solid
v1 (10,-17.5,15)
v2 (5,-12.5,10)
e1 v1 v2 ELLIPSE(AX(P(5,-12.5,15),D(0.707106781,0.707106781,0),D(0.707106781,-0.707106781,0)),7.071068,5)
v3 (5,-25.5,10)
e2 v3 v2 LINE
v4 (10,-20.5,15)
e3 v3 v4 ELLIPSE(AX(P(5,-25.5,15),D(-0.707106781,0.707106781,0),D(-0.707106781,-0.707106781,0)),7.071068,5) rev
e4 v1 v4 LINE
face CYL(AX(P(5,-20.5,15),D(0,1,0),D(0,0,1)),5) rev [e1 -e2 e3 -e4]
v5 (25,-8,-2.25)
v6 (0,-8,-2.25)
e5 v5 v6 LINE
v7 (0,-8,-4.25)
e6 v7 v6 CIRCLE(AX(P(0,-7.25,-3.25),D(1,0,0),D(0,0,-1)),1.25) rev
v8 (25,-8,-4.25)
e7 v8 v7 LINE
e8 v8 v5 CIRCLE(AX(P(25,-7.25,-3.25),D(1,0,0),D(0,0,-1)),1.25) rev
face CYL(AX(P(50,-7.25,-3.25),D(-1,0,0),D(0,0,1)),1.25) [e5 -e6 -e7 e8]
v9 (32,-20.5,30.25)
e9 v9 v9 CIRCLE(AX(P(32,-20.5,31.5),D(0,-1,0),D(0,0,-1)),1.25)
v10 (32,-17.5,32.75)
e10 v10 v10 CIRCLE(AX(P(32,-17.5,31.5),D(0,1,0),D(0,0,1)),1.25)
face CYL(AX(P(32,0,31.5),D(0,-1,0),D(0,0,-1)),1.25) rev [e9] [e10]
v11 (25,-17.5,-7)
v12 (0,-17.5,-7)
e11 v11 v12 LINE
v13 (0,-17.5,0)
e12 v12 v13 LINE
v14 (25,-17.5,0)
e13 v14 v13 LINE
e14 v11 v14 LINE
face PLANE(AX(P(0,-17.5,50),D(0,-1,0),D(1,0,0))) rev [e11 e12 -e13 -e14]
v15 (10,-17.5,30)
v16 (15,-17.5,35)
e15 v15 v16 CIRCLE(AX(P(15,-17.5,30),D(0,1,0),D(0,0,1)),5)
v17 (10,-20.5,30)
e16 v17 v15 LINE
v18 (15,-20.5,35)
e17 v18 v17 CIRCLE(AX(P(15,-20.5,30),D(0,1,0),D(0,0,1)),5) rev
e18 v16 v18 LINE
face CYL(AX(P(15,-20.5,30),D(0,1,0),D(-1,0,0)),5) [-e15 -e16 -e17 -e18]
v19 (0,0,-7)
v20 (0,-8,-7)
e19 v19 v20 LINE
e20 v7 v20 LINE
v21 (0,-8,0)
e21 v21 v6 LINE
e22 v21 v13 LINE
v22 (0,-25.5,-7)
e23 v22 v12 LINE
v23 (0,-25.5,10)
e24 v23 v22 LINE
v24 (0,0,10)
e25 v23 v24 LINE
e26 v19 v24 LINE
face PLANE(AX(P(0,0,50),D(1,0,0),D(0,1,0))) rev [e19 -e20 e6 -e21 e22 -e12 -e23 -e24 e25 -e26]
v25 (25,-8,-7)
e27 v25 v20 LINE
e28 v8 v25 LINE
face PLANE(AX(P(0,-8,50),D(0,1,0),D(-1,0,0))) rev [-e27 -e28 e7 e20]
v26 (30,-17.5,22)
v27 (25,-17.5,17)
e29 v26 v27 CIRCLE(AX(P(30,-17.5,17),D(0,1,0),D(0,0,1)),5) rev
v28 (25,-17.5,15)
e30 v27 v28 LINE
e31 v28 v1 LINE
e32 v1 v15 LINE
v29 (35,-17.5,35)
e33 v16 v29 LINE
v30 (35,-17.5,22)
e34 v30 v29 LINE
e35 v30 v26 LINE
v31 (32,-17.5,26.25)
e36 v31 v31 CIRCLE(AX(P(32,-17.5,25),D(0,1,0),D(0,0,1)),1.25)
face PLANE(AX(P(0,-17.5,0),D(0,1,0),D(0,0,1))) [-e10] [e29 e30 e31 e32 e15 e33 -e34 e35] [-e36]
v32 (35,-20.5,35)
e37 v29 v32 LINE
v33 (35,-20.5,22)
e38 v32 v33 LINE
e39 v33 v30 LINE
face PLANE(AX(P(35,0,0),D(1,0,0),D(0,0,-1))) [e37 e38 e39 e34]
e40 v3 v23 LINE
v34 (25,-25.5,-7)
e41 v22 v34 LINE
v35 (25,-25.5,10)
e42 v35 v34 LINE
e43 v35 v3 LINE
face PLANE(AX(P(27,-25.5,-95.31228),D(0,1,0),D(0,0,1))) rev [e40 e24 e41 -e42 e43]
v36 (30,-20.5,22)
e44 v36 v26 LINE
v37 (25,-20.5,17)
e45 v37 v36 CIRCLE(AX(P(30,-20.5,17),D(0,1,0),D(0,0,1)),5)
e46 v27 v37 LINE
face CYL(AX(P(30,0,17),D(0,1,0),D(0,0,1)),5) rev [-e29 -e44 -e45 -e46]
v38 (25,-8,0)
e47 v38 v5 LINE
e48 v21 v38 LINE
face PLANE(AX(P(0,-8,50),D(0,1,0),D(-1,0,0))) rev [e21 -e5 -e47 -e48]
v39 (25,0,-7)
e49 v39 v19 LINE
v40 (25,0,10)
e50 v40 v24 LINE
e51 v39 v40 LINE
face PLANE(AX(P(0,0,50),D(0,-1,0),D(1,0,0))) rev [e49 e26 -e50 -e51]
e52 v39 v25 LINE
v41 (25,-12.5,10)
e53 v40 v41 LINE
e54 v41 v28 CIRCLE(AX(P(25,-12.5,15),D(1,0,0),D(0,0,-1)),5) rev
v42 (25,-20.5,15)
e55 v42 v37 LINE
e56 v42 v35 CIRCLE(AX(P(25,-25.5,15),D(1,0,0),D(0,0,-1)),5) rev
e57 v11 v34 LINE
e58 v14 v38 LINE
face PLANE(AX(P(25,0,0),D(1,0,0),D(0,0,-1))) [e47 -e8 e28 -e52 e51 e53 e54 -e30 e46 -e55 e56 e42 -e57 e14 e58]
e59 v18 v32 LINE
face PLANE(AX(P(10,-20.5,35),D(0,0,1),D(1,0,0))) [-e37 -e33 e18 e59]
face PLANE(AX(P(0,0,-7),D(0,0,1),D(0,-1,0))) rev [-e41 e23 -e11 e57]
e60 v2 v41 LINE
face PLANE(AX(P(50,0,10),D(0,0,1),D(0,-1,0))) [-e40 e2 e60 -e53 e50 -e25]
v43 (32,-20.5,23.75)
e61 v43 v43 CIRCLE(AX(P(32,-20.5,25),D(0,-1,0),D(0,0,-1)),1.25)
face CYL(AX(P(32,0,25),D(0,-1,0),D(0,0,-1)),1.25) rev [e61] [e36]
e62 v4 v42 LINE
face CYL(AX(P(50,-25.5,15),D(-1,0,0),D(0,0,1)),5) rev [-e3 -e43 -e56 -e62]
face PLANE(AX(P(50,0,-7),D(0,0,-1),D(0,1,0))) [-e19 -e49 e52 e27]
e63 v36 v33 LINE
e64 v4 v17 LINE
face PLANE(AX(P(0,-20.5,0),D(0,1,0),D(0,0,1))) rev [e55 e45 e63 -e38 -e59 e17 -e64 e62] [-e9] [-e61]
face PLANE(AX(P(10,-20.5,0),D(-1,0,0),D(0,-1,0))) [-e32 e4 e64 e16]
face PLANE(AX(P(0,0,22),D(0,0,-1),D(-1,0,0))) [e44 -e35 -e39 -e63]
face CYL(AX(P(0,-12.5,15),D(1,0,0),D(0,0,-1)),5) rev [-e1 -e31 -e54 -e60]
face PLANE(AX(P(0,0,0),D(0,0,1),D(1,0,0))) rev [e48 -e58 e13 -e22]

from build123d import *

# Parameters (mm, degrees)
BOSS_EXTRUDE1_DEPTH = 50
SKETCH2_W           = 7
SKETCH2_H           = 8
BOSS_EXTRUDE2_DEPTH = 50
SKETCH2_3_W         = 7
SKETCH2_3_H         = 8
BOSS_EXTRUDE3_DEPTH = 18
SKETCH3_W           = 10
SKETCH3_H           = 63
SKETCH3_W_2         = 7
SKETCH3_H_2         = 8
BOSS_EXTRUDE4_DEPTH = 82
FILLET1_R           = 5
SKETCH4_W           = 49
SKETCH4_H           = 25.5
CUT_EXTRUDE1_DEPTH  = 63
SKETCH5_W           = 25.5
SKETCH5_H           = 10
SKETCH5_H_2         = 12
BOSS_EXTRUDE5_DEPTH = 49
CUT_EXTRUDE2_DEPTH  = 25.5
SKETCH6_R           = 1.75
CUT_EXTRUDE3_DEPTH  = 5
SKETCH6_6_R         = 0.75
CUT_EXTRUDE4_DEPTH  = 15
SKETCH8_W           = 18
SKETCH8_H           = 9.5
CUT_EXTRUDE5_DEPTH  = 40
SKETCH9_W           = 40
SKETCH9_H           = 25.5
CUT_EXTRUDE6_DEPTH  = 110.982953225
SKETCH10_W          = 32
SKETCH10_H          = 88.5
CUT_EXTRUDE7_DEPTH  = 111.174861016
SKETCH11_W          = 50
SKETCH11_H          = 63
CUT_EXTRUDE8_DEPTH  = 105.797423632
SKETCH12_W          = 25.5
SKETCH12_H          = 35
BOSS_EXTRUDE7_DEPTH = 10
SKETCH12_3_R        = 10
CUT_EXTRUDE9_DEPTH  = 107.716915248
SKETCH13_W          = 42.5
SKETCH13_H          = 88.5
CUT_EXTRUDE10_DEPTH = 25
SKETCH14_W          = 25
SKETCH14_H          = 28
CUT_EXTRUDE11_DEPTH = 96.433222727
SKETCH15_W          = 25
SKETCH15_H          = 60.5
CUT_EXTRUDE12_DEPTH = 71.25311381
SKETCH16_W          = 10
SKETCH16_H          = 35
CUT_EXTRUDE13_DEPTH = 68.633201906
SKETCH17_W          = 15
SKETCH17_H          = 35
BOSS_EXTRUDE8_DEPTH = 3
BOSS_EXTRUDE9_DEPTH = 10
SKETCH19_R          = 1.25
CUT_EXTRUDE14_DEPTH = 54.574714185
FILLET4_R           = 5


with BuildPart() as part:
    # Sketch1 → Boss-Extrude1 (new body)
    with BuildSketch(Plane.XY):
        with BuildLine():
            Line((-2.25, -8), (-4.25, -8))
            ThreePointArc((-4.25, -8), (-3.25, -8.5), (-2.25, -8))
        make_face()
        Polygon((10, -25.5), (10, 0), (0, 0), (-18, 0), (-18, -8), (0, -8), (0, -17.5), (-18, -17.5), (-18, -25.5), align=None)
    extrude(amount=BOSS_EXTRUDE1_DEPTH)

    # Sketch2 → Boss-Extrude2 (add)
    with BuildSketch(Plane(origin=(0, 0, 0), x_dir=(0, 0, -1), z_dir=(1, 0, 0))):
        Polygon((7, 0), (0, 0), (0, -8), (2.25, -8), (4.25, -8), (7, -8), align=None)
        Polygon((0, -8), (0, 0), (-10, 0), (-10, -25.5), (0, -25.5), (0, -17.5), align=None)
        with Locations((3.5, -21.5)):
            Rectangle(SKETCH2_W, SKETCH2_H)
        with BuildLine():
            Line((4.25, -8), (2.25, -8))
            ThreePointArc((2.25, -8), (3.25, -8.5), (4.25, -8))
        make_face()
    extrude(amount=BOSS_EXTRUDE2_DEPTH)

    # Sketch2<3> → Boss-Extrude3 (add)
    with BuildSketch(Plane(origin=(0, 0, 0), x_dir=(0, 0, -1), z_dir=(1, 0, 0))):
        Polygon((7, 0), (0, 0), (0, -8), (2.25, -8), (4.25, -8), (7, -8), align=None)
        with Locations((3.5, -21.5)):
            Rectangle(SKETCH2_3_W, SKETCH2_3_H)
    extrude(amount=-BOSS_EXTRUDE3_DEPTH)

    # Sketch3 → Boss-Extrude4 (add)
    with BuildSketch(Plane(origin=(50, 0, 0), x_dir=(0, 0, -1), z_dir=(1, 0, 0))):
        Polygon((32.5, -17.5), (7, -17.5), (7, -25.5), (0, -25.5), (0, -88.5), (32.5, -88.5), align=None)
        with Locations((-5, -57)):
            Rectangle(SKETCH3_W, SKETCH3_H)
        with Locations((3.5, -21.5)):
            Rectangle(SKETCH3_W_2, SKETCH3_H_2)
        with Locations((-5, -21.5)):
            Rectangle(SKETCH3_W, SKETCH3_H_2)
    extrude(amount=-BOSS_EXTRUDE4_DEPTH)

    # Fillet1
    fillet1_edges = [part.edges().sort_by_distance(p)[0] for p in [
        (-32, -17.5, -11.25),
        (-32, -53, -32.5),
        (9, -17.5, -32.5),
    ]]
    fillet(fillet1_edges, radius=FILLET1_R)

    # Sketch4 → Cut-Extrude1 (cut)
    with BuildSketch(Plane.XZ.offset(88.5)):
        with Locations((25.5, -2.75)):
            Rectangle(SKETCH4_W, SKETCH4_H)
    extrude(amount=-CUT_EXTRUDE1_DEPTH, mode=Mode.SUBTRACT)

    # Sketch5 → Boss-Extrude5 (add)
    with BuildSketch(Plane(origin=(50, 0, 0), x_dir=(0, 0, -1), z_dir=(1, 0, 0))):
        with Locations((2.75, -30.5)):
            Rectangle(SKETCH5_W, SKETCH5_H)
        with Locations((2.75, -82.5)):
            Rectangle(SKETCH5_W, SKETCH5_H_2)
    extrude(amount=-BOSS_EXTRUDE5_DEPTH)

    # Sketch7 → Cut-Extrude2 (cut)
    with BuildSketch(Plane.XY.offset(10)):
        Polygon((1, -35.5), (27, -35.5), (27, -25.5), (50, -25.5), (50, -88.5), (27, -88.5), (27, -76.5), (1, -76.5), align=None)
    extrude(amount=-CUT_EXTRUDE2_DEPTH, mode=Mode.SUBTRACT)

    # Sketch6 → Cut-Extrude3 (cut)
    with BuildSketch(Plane(origin=(27, 0, 0), x_dir=(0, 0, -1), z_dir=(1, 0, 0))):
        with Locations((0.25, -81.5)):
            Circle(SKETCH6_R)
        with Locations((10.25, -81.5)):
            Circle(SKETCH6_R)
        with Locations((10.25, -32.5)):
            Circle(SKETCH6_R)
        with Locations((0.25, -32.5)):
            Circle(SKETCH6_R)
    extrude(amount=-CUT_EXTRUDE3_DEPTH, mode=Mode.SUBTRACT)

    # Sketch6<6> → Cut-Extrude4 (cut)
    with BuildSketch(Plane(origin=(27, 0, 0), x_dir=(0, 0, -1), z_dir=(1, 0, 0))):
        with Locations((0.25, -81.5)):
            Circle(SKETCH6_6_R)
        with Locations((10.25, -81.5)):
            Circle(SKETCH6_6_R)
        with Locations((10.25, -32.5)):
            Circle(SKETCH6_6_R)
        with Locations((0.25, -32.5)):
            Circle(SKETCH6_6_R)
    extrude(amount=-CUT_EXTRUDE4_DEPTH, mode=Mode.SUBTRACT)

    # Sketch8 → Cut-Extrude5 (cut)
    with BuildSketch(Plane(origin=(0, 0, -7), x_dir=(-1, 0, 0), z_dir=(0, 0, -1))):
        with Locations((9, -12.75)):
            Rectangle(SKETCH8_W, SKETCH8_H)
    extrude(amount=-CUT_EXTRUDE5_DEPTH, mode=Mode.SUBTRACT)

    # Sketch9 → Cut-Extrude6 (cut, through all)
    with BuildSketch(Plane(origin=(10, 0, 0), x_dir=(0, 0, -1), z_dir=(1, 0, 0))):
        with Locations((-30, -12.75)):
            Rectangle(SKETCH9_W, SKETCH9_H)
    extrude(amount=-CUT_EXTRUDE6_DEPTH, mode=Mode.SUBTRACT)

    # Sketch10 → Cut-Extrude7 (cut, through all)
    with BuildSketch(Plane.XY.offset(10)):
        with Locations((-16, -44.25)):
            Rectangle(SKETCH10_W, SKETCH10_H)
    extrude(amount=-CUT_EXTRUDE7_DEPTH, mode=Mode.SUBTRACT)

    # Sketch11 → Cut-Extrude8 (cut, through all)
    with BuildSketch(Plane.XY.offset(-15.5)):
        with Locations((25, -57)):
            Rectangle(SKETCH11_W, SKETCH11_H)
    extrude(amount=CUT_EXTRUDE8_DEPTH, mode=Mode.SUBTRACT)

    # Sketch12 → Boss-Extrude7 (add)
    with BuildSketch(Plane.ZY):
        with Locations((-2.75, -43)):
            Rectangle(SKETCH12_W, SKETCH12_H)
    extrude(amount=-BOSS_EXTRUDE7_DEPTH)

    # Sketch12<3> → Cut-Extrude9 (cut, through all)
    with BuildSketch(Plane.ZY):
        with Locations(Location((-5.5, -42.5, 0), (0, 0, 270))):
            Circle(SKETCH12_3_R)
    extrude(amount=-CUT_EXTRUDE9_DEPTH, mode=Mode.SUBTRACT)

    # Sketch13 → Cut-Extrude10 (cut)
    with BuildSketch(Plane(origin=(50, 0, 0), x_dir=(0, 0, -1), z_dir=(1, 0, 0))):
        with Locations((11.25, -44.25)):
            Rectangle(SKETCH13_W, SKETCH13_H)
    extrude(amount=-CUT_EXTRUDE10_DEPTH, mode=Mode.SUBTRACT)

    # Sketch14 → Cut-Extrude11 (cut, through all)
    with BuildSketch(Plane.XY.offset(-15.5)):
        with Locations((12.5, -74.5)):
            Rectangle(SKETCH14_W, SKETCH14_H)
    extrude(amount=-CUT_EXTRUDE11_DEPTH, mode=Mode.SUBTRACT)

    # Sketch15 → Cut-Extrude12 (cut, through all)
    with BuildSketch(Plane(origin=(0, 0, -7), x_dir=(-1, 0, 0), z_dir=(0, 0, -1))):
        with Locations((-12.5, -30.25)):
            Rectangle(SKETCH15_W, SKETCH15_H)
    extrude(amount=CUT_EXTRUDE12_DEPTH, mode=Mode.SUBTRACT)

    # Sketch16 → Cut-Extrude13 (cut, through all)
    with BuildSketch(Plane(origin=(0, 0, -7), x_dir=(-1, 0, 0), z_dir=(0, 0, -1))):
        with Locations((-5, -43)):
            Rectangle(SKETCH16_W, SKETCH16_H)
    extrude(amount=-CUT_EXTRUDE13_DEPTH, mode=Mode.SUBTRACT)

    # Sketch17 → Boss-Extrude8 (add)
    with BuildSketch(Plane(origin=(0, -17.5, 0), x_dir=(1, 0, 0), z_dir=(0, 1, 0))):
        with Locations((17.5, -17.5)):
            Rectangle(SKETCH17_W, SKETCH17_H)
    extrude(amount=-BOSS_EXTRUDE8_DEPTH)

    # Sketch18 → Boss-Extrude9 (add)
    with BuildSketch(Plane(origin=(25, 0, 0), x_dir=(0, 0, -1), z_dir=(1, 0, 0))):
        Polygon((-10, -17.5), (-35, -17.5), (-35, -20.5), (-10, -20.5), (0, -20.5), (0, -17.5), align=None)
    extrude(amount=BOSS_EXTRUDE9_DEPTH)

    # Sketch19 → Cut-Extrude14 (cut, through all)
    with BuildSketch(Plane.XZ.offset(20.5)):
        Polygon((35, 0), (35, 22), (25, 22), (25, 10), (25, 0), align=None)
        with Locations(Location((32, 25, 0), (0, 0, 270))):
            Circle(SKETCH19_R)
        with Locations(Location((32, 31.5, 0), (0, 0, 270))):
            Circle(SKETCH19_R)
    extrude(amount=-CUT_EXTRUDE14_DEPTH, mode=Mode.SUBTRACT)

    # Fillet4
    fillet4_edges = [part.edges().sort_by_distance(p)[0] for p in [
        (10, -19, 10),
        (17.5, -20.5, 10),
        (10, -19, 35),
        (17.5, -17.5, 10),
        (25, -19, 22),
    ]]
    fillet(fillet4_edges, radius=FILLET4_R - 0.0001)  # a hair under: the kernel refuses the full size


solid = part.part
